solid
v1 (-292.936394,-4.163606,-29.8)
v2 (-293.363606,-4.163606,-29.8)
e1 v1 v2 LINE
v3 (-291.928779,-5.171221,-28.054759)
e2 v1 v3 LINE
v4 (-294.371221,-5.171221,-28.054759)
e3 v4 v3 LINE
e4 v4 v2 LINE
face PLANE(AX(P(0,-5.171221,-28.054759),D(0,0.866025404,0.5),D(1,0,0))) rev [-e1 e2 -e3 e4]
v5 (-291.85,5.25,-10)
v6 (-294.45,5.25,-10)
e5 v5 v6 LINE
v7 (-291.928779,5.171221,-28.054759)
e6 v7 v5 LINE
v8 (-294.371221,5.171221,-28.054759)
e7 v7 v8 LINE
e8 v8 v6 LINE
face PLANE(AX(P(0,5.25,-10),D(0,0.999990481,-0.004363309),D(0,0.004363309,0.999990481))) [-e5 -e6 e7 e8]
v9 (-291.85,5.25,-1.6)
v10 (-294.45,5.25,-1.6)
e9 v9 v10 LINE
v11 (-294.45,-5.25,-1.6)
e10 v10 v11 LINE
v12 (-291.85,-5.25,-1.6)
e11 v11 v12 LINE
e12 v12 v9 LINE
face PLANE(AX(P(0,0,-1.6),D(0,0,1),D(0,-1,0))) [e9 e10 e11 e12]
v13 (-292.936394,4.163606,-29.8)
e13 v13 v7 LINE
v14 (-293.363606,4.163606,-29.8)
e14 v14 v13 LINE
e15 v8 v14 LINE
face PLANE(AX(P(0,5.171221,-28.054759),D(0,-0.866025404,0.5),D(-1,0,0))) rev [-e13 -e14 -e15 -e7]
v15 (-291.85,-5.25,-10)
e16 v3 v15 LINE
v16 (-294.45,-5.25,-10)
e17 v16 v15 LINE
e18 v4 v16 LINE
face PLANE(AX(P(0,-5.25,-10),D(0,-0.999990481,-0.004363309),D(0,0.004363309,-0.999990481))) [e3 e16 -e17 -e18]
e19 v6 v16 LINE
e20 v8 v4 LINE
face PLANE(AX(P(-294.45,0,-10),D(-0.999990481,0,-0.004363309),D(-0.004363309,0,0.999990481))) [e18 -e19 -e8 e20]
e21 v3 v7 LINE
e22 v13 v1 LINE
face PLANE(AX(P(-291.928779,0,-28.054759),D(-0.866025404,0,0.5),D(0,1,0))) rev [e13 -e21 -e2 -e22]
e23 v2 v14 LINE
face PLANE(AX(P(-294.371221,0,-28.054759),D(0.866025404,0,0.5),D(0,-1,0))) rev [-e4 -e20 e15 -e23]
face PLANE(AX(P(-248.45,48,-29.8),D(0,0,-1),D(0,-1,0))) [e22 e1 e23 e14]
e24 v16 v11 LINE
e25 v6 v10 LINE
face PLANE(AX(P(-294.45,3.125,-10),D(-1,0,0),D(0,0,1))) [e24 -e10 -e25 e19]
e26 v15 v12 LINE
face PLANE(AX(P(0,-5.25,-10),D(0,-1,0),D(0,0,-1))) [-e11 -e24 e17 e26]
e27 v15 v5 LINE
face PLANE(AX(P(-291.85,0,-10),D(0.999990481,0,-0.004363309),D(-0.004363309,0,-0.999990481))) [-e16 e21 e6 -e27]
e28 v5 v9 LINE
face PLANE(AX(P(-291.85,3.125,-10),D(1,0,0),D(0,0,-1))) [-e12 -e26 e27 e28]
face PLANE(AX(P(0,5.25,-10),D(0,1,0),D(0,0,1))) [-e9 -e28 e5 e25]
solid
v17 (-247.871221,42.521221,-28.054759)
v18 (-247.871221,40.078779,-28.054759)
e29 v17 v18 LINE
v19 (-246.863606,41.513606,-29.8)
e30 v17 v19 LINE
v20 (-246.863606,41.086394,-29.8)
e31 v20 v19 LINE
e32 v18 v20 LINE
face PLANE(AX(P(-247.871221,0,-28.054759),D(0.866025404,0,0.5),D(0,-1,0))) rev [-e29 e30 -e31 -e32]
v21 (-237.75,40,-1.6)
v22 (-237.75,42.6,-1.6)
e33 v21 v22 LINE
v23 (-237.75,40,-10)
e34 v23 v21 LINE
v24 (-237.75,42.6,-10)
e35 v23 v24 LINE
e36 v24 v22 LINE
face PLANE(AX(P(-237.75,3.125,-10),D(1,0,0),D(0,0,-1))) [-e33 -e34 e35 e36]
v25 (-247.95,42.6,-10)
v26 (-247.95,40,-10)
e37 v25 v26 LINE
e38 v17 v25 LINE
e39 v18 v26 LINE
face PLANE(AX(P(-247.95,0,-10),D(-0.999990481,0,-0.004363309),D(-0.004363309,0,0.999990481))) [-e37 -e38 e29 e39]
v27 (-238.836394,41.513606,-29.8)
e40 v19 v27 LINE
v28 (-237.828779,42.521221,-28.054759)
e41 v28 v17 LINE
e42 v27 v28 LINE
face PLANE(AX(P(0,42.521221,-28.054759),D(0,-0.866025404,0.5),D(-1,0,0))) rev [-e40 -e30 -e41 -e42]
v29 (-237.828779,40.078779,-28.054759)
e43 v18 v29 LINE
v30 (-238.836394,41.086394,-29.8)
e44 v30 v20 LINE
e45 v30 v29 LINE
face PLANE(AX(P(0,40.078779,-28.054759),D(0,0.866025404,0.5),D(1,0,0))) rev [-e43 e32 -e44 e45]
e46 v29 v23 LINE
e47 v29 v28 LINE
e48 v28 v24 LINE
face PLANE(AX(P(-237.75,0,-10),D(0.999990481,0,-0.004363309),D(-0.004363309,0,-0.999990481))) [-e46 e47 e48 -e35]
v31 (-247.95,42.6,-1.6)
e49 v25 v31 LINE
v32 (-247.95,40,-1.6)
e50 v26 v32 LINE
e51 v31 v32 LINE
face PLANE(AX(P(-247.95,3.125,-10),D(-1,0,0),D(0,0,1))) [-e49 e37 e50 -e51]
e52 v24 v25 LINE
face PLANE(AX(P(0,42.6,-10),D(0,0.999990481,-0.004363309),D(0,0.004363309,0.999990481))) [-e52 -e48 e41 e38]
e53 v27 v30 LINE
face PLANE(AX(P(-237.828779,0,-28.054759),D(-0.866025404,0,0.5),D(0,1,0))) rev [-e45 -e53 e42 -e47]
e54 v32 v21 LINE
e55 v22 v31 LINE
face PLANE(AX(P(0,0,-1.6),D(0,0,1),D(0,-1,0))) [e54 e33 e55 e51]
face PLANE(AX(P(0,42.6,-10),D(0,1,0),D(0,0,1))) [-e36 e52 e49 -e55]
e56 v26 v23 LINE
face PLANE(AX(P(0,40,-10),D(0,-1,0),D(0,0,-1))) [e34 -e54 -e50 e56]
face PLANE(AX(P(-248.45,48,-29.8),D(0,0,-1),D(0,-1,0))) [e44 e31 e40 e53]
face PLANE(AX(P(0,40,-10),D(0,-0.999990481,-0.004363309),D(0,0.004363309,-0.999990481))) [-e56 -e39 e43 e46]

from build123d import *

# Parameters (mm, degrees)
SHIMS_TOP_START          = -1.6
SHIMS_SKETCH_W           = 2.6
SHIMS_SKETCH_H           = 10.5
SHIMS_TOP_DEPTH          = 8.4
SHIMS_SKETCH_W_2         = 10.2
SHIMS_SKETCH_H_2         = 2.6
SHIMS_TOP_2_DEPTH        = 8.4
SHIMS_BOTTOM_OUTLINE_W   = 10.027211308
SHIMS_BOTTOM_OUTLINE_H   = 2.427211308
SHIMS_BOTTOM_DEPTH       = 19.8
SHIMS_BOTTOM_DRAFT       = -0.25
SHIMS_BOTTOM_2_OUTLINE_W = 2.427211308
SHIMS_BOTTOM_2_OUTLINE_H = 10.327211308
SHIMS_BOTTOM_2_DEPTH     = 19.8
SHIMS_BOTTOM_2_DRAFT     = -0.25
CHAMFER1_SIZE            = 1
CHAMFER1_SIZE2           = 1.745257156
CHAMFER2_SIZE            = 1
CHAMFER2_SIZE2           = 1.745257156


# Read off the part's stored shape, not the designer's step: shims_bottom
with BuildPart() as part:
    # shims_sketch → shims_top (new body)
    with BuildSketch(Plane.XY.offset(SHIMS_TOP_START)):
        with Locations((-293.15, 0)):
            Rectangle(SHIMS_SKETCH_W, SHIMS_SKETCH_H)
    extrude(amount=-SHIMS_TOP_DEPTH)


with BuildPart() as body_2:
    # shims_sketch → shims_top 2 (new body)
    with BuildSketch(Plane.XY.offset(SHIMS_TOP_START)):
        with Locations((-242.85, 41.3)):
            Rectangle(SHIMS_SKETCH_W_2, SHIMS_SKETCH_H_2)
    extrude(amount=-SHIMS_TOP_2_DEPTH)


with BuildPart() as shims_bottom_tool:
    # shims_bottom outline → shims_bottom (with draft: the straight prism first)
    with BuildSketch(Plane.XY.offset(-29.8)):
        with Locations((-242.85, 41.3)):
            Rectangle(SHIMS_BOTTOM_OUTLINE_W, SHIMS_BOTTOM_OUTLINE_H)
    extrude(amount=SHIMS_BOTTOM_DEPTH)
    # shims_bottom: the draft: its side faces are tilted about the plane it starts from
    shims_bottom_sides = [shims_bottom_tool.faces().sort_by_distance(p)[0] for p in [
        (-242.85, 40.086394346, -19.9),
        (-237.836394346, 41.3, -19.9),
        (-242.85, 42.513605654, -19.9),
        (-247.863605654, 41.3, -19.9),
    ]]
    draft(shims_bottom_sides, Plane.XY.offset(-29.8), SHIMS_BOTTOM_DRAFT)


with BuildPart() as part_1:
    add(part.part)

    # shims_bottom: add shims_bottom_tool
    add(shims_bottom_tool.part)

    add(body_2.part)  # shims_bottom merges body 2


with BuildPart() as shims_bottom_2_tool:
    # shims_bottom 2 outline → shims_bottom 2 (with draft: the straight prism first)
    with BuildSketch(Plane.XY.offset(-29.8)):
        with Locations((-293.15, 0)):
            Rectangle(SHIMS_BOTTOM_2_OUTLINE_W, SHIMS_BOTTOM_2_OUTLINE_H)
    extrude(amount=SHIMS_BOTTOM_2_DEPTH)
    # shims_bottom 2: the draft: its side faces are tilted about the plane it starts from
    shims_bottom_2_sides = [shims_bottom_2_tool.faces().sort_by_distance(p)[0] for p in [
        (-293.15, -5.163605654, -19.9),
        (-291.936394346, 0, -19.9),
        (-293.15, 5.163605654, -19.9),
        (-294.363605654, 0, -19.9),
    ]]
    draft(shims_bottom_2_sides, Plane.XY.offset(-29.8), SHIMS_BOTTOM_2_DRAFT)


with BuildPart() as part_2:
    add(part_1.part)

    # shims_bottom 2: add shims_bottom_2_tool
    add(shims_bottom_2_tool.part)

    # Chamfer1
    chamfer1_edges = [part_2.edges().sort_by_distance(p)[0] for p in [
        (-293.15, -5.163605654, -29.8),
        (-291.936394346, 0, -29.8),
        (-293.15, 5.163605654, -29.8),
        (-294.363605654, 0, -29.8),
    ]]
    chamfer1_side = [part_2.faces().sort_by_distance(p)[0] for p in [
        (-293.15, 0, -29.8),
    ]]
    chamfer(chamfer1_edges, length=CHAMFER1_SIZE, length2=CHAMFER1_SIZE2, reference=chamfer1_side[0])

    # Chamfer2
    chamfer2_edges = [part_2.edges().sort_by_distance(p)[0] for p in [
        (-237.836394346, 41.3, -29.8),
        (-242.85, 42.513605654, -29.8),
        (-247.863605654, 41.3, -29.8),
        (-242.85, 40.086394346, -29.8),
    ]]
    chamfer2_side = [part_2.faces().sort_by_distance(p)[0] for p in [
        (-242.85, 41.3, -29.8),
    ]]
    chamfer(chamfer2_edges, length=CHAMFER2_SIZE, length2=CHAMFER2_SIZE2, reference=chamfer2_side[0])


solid = part_2.part
